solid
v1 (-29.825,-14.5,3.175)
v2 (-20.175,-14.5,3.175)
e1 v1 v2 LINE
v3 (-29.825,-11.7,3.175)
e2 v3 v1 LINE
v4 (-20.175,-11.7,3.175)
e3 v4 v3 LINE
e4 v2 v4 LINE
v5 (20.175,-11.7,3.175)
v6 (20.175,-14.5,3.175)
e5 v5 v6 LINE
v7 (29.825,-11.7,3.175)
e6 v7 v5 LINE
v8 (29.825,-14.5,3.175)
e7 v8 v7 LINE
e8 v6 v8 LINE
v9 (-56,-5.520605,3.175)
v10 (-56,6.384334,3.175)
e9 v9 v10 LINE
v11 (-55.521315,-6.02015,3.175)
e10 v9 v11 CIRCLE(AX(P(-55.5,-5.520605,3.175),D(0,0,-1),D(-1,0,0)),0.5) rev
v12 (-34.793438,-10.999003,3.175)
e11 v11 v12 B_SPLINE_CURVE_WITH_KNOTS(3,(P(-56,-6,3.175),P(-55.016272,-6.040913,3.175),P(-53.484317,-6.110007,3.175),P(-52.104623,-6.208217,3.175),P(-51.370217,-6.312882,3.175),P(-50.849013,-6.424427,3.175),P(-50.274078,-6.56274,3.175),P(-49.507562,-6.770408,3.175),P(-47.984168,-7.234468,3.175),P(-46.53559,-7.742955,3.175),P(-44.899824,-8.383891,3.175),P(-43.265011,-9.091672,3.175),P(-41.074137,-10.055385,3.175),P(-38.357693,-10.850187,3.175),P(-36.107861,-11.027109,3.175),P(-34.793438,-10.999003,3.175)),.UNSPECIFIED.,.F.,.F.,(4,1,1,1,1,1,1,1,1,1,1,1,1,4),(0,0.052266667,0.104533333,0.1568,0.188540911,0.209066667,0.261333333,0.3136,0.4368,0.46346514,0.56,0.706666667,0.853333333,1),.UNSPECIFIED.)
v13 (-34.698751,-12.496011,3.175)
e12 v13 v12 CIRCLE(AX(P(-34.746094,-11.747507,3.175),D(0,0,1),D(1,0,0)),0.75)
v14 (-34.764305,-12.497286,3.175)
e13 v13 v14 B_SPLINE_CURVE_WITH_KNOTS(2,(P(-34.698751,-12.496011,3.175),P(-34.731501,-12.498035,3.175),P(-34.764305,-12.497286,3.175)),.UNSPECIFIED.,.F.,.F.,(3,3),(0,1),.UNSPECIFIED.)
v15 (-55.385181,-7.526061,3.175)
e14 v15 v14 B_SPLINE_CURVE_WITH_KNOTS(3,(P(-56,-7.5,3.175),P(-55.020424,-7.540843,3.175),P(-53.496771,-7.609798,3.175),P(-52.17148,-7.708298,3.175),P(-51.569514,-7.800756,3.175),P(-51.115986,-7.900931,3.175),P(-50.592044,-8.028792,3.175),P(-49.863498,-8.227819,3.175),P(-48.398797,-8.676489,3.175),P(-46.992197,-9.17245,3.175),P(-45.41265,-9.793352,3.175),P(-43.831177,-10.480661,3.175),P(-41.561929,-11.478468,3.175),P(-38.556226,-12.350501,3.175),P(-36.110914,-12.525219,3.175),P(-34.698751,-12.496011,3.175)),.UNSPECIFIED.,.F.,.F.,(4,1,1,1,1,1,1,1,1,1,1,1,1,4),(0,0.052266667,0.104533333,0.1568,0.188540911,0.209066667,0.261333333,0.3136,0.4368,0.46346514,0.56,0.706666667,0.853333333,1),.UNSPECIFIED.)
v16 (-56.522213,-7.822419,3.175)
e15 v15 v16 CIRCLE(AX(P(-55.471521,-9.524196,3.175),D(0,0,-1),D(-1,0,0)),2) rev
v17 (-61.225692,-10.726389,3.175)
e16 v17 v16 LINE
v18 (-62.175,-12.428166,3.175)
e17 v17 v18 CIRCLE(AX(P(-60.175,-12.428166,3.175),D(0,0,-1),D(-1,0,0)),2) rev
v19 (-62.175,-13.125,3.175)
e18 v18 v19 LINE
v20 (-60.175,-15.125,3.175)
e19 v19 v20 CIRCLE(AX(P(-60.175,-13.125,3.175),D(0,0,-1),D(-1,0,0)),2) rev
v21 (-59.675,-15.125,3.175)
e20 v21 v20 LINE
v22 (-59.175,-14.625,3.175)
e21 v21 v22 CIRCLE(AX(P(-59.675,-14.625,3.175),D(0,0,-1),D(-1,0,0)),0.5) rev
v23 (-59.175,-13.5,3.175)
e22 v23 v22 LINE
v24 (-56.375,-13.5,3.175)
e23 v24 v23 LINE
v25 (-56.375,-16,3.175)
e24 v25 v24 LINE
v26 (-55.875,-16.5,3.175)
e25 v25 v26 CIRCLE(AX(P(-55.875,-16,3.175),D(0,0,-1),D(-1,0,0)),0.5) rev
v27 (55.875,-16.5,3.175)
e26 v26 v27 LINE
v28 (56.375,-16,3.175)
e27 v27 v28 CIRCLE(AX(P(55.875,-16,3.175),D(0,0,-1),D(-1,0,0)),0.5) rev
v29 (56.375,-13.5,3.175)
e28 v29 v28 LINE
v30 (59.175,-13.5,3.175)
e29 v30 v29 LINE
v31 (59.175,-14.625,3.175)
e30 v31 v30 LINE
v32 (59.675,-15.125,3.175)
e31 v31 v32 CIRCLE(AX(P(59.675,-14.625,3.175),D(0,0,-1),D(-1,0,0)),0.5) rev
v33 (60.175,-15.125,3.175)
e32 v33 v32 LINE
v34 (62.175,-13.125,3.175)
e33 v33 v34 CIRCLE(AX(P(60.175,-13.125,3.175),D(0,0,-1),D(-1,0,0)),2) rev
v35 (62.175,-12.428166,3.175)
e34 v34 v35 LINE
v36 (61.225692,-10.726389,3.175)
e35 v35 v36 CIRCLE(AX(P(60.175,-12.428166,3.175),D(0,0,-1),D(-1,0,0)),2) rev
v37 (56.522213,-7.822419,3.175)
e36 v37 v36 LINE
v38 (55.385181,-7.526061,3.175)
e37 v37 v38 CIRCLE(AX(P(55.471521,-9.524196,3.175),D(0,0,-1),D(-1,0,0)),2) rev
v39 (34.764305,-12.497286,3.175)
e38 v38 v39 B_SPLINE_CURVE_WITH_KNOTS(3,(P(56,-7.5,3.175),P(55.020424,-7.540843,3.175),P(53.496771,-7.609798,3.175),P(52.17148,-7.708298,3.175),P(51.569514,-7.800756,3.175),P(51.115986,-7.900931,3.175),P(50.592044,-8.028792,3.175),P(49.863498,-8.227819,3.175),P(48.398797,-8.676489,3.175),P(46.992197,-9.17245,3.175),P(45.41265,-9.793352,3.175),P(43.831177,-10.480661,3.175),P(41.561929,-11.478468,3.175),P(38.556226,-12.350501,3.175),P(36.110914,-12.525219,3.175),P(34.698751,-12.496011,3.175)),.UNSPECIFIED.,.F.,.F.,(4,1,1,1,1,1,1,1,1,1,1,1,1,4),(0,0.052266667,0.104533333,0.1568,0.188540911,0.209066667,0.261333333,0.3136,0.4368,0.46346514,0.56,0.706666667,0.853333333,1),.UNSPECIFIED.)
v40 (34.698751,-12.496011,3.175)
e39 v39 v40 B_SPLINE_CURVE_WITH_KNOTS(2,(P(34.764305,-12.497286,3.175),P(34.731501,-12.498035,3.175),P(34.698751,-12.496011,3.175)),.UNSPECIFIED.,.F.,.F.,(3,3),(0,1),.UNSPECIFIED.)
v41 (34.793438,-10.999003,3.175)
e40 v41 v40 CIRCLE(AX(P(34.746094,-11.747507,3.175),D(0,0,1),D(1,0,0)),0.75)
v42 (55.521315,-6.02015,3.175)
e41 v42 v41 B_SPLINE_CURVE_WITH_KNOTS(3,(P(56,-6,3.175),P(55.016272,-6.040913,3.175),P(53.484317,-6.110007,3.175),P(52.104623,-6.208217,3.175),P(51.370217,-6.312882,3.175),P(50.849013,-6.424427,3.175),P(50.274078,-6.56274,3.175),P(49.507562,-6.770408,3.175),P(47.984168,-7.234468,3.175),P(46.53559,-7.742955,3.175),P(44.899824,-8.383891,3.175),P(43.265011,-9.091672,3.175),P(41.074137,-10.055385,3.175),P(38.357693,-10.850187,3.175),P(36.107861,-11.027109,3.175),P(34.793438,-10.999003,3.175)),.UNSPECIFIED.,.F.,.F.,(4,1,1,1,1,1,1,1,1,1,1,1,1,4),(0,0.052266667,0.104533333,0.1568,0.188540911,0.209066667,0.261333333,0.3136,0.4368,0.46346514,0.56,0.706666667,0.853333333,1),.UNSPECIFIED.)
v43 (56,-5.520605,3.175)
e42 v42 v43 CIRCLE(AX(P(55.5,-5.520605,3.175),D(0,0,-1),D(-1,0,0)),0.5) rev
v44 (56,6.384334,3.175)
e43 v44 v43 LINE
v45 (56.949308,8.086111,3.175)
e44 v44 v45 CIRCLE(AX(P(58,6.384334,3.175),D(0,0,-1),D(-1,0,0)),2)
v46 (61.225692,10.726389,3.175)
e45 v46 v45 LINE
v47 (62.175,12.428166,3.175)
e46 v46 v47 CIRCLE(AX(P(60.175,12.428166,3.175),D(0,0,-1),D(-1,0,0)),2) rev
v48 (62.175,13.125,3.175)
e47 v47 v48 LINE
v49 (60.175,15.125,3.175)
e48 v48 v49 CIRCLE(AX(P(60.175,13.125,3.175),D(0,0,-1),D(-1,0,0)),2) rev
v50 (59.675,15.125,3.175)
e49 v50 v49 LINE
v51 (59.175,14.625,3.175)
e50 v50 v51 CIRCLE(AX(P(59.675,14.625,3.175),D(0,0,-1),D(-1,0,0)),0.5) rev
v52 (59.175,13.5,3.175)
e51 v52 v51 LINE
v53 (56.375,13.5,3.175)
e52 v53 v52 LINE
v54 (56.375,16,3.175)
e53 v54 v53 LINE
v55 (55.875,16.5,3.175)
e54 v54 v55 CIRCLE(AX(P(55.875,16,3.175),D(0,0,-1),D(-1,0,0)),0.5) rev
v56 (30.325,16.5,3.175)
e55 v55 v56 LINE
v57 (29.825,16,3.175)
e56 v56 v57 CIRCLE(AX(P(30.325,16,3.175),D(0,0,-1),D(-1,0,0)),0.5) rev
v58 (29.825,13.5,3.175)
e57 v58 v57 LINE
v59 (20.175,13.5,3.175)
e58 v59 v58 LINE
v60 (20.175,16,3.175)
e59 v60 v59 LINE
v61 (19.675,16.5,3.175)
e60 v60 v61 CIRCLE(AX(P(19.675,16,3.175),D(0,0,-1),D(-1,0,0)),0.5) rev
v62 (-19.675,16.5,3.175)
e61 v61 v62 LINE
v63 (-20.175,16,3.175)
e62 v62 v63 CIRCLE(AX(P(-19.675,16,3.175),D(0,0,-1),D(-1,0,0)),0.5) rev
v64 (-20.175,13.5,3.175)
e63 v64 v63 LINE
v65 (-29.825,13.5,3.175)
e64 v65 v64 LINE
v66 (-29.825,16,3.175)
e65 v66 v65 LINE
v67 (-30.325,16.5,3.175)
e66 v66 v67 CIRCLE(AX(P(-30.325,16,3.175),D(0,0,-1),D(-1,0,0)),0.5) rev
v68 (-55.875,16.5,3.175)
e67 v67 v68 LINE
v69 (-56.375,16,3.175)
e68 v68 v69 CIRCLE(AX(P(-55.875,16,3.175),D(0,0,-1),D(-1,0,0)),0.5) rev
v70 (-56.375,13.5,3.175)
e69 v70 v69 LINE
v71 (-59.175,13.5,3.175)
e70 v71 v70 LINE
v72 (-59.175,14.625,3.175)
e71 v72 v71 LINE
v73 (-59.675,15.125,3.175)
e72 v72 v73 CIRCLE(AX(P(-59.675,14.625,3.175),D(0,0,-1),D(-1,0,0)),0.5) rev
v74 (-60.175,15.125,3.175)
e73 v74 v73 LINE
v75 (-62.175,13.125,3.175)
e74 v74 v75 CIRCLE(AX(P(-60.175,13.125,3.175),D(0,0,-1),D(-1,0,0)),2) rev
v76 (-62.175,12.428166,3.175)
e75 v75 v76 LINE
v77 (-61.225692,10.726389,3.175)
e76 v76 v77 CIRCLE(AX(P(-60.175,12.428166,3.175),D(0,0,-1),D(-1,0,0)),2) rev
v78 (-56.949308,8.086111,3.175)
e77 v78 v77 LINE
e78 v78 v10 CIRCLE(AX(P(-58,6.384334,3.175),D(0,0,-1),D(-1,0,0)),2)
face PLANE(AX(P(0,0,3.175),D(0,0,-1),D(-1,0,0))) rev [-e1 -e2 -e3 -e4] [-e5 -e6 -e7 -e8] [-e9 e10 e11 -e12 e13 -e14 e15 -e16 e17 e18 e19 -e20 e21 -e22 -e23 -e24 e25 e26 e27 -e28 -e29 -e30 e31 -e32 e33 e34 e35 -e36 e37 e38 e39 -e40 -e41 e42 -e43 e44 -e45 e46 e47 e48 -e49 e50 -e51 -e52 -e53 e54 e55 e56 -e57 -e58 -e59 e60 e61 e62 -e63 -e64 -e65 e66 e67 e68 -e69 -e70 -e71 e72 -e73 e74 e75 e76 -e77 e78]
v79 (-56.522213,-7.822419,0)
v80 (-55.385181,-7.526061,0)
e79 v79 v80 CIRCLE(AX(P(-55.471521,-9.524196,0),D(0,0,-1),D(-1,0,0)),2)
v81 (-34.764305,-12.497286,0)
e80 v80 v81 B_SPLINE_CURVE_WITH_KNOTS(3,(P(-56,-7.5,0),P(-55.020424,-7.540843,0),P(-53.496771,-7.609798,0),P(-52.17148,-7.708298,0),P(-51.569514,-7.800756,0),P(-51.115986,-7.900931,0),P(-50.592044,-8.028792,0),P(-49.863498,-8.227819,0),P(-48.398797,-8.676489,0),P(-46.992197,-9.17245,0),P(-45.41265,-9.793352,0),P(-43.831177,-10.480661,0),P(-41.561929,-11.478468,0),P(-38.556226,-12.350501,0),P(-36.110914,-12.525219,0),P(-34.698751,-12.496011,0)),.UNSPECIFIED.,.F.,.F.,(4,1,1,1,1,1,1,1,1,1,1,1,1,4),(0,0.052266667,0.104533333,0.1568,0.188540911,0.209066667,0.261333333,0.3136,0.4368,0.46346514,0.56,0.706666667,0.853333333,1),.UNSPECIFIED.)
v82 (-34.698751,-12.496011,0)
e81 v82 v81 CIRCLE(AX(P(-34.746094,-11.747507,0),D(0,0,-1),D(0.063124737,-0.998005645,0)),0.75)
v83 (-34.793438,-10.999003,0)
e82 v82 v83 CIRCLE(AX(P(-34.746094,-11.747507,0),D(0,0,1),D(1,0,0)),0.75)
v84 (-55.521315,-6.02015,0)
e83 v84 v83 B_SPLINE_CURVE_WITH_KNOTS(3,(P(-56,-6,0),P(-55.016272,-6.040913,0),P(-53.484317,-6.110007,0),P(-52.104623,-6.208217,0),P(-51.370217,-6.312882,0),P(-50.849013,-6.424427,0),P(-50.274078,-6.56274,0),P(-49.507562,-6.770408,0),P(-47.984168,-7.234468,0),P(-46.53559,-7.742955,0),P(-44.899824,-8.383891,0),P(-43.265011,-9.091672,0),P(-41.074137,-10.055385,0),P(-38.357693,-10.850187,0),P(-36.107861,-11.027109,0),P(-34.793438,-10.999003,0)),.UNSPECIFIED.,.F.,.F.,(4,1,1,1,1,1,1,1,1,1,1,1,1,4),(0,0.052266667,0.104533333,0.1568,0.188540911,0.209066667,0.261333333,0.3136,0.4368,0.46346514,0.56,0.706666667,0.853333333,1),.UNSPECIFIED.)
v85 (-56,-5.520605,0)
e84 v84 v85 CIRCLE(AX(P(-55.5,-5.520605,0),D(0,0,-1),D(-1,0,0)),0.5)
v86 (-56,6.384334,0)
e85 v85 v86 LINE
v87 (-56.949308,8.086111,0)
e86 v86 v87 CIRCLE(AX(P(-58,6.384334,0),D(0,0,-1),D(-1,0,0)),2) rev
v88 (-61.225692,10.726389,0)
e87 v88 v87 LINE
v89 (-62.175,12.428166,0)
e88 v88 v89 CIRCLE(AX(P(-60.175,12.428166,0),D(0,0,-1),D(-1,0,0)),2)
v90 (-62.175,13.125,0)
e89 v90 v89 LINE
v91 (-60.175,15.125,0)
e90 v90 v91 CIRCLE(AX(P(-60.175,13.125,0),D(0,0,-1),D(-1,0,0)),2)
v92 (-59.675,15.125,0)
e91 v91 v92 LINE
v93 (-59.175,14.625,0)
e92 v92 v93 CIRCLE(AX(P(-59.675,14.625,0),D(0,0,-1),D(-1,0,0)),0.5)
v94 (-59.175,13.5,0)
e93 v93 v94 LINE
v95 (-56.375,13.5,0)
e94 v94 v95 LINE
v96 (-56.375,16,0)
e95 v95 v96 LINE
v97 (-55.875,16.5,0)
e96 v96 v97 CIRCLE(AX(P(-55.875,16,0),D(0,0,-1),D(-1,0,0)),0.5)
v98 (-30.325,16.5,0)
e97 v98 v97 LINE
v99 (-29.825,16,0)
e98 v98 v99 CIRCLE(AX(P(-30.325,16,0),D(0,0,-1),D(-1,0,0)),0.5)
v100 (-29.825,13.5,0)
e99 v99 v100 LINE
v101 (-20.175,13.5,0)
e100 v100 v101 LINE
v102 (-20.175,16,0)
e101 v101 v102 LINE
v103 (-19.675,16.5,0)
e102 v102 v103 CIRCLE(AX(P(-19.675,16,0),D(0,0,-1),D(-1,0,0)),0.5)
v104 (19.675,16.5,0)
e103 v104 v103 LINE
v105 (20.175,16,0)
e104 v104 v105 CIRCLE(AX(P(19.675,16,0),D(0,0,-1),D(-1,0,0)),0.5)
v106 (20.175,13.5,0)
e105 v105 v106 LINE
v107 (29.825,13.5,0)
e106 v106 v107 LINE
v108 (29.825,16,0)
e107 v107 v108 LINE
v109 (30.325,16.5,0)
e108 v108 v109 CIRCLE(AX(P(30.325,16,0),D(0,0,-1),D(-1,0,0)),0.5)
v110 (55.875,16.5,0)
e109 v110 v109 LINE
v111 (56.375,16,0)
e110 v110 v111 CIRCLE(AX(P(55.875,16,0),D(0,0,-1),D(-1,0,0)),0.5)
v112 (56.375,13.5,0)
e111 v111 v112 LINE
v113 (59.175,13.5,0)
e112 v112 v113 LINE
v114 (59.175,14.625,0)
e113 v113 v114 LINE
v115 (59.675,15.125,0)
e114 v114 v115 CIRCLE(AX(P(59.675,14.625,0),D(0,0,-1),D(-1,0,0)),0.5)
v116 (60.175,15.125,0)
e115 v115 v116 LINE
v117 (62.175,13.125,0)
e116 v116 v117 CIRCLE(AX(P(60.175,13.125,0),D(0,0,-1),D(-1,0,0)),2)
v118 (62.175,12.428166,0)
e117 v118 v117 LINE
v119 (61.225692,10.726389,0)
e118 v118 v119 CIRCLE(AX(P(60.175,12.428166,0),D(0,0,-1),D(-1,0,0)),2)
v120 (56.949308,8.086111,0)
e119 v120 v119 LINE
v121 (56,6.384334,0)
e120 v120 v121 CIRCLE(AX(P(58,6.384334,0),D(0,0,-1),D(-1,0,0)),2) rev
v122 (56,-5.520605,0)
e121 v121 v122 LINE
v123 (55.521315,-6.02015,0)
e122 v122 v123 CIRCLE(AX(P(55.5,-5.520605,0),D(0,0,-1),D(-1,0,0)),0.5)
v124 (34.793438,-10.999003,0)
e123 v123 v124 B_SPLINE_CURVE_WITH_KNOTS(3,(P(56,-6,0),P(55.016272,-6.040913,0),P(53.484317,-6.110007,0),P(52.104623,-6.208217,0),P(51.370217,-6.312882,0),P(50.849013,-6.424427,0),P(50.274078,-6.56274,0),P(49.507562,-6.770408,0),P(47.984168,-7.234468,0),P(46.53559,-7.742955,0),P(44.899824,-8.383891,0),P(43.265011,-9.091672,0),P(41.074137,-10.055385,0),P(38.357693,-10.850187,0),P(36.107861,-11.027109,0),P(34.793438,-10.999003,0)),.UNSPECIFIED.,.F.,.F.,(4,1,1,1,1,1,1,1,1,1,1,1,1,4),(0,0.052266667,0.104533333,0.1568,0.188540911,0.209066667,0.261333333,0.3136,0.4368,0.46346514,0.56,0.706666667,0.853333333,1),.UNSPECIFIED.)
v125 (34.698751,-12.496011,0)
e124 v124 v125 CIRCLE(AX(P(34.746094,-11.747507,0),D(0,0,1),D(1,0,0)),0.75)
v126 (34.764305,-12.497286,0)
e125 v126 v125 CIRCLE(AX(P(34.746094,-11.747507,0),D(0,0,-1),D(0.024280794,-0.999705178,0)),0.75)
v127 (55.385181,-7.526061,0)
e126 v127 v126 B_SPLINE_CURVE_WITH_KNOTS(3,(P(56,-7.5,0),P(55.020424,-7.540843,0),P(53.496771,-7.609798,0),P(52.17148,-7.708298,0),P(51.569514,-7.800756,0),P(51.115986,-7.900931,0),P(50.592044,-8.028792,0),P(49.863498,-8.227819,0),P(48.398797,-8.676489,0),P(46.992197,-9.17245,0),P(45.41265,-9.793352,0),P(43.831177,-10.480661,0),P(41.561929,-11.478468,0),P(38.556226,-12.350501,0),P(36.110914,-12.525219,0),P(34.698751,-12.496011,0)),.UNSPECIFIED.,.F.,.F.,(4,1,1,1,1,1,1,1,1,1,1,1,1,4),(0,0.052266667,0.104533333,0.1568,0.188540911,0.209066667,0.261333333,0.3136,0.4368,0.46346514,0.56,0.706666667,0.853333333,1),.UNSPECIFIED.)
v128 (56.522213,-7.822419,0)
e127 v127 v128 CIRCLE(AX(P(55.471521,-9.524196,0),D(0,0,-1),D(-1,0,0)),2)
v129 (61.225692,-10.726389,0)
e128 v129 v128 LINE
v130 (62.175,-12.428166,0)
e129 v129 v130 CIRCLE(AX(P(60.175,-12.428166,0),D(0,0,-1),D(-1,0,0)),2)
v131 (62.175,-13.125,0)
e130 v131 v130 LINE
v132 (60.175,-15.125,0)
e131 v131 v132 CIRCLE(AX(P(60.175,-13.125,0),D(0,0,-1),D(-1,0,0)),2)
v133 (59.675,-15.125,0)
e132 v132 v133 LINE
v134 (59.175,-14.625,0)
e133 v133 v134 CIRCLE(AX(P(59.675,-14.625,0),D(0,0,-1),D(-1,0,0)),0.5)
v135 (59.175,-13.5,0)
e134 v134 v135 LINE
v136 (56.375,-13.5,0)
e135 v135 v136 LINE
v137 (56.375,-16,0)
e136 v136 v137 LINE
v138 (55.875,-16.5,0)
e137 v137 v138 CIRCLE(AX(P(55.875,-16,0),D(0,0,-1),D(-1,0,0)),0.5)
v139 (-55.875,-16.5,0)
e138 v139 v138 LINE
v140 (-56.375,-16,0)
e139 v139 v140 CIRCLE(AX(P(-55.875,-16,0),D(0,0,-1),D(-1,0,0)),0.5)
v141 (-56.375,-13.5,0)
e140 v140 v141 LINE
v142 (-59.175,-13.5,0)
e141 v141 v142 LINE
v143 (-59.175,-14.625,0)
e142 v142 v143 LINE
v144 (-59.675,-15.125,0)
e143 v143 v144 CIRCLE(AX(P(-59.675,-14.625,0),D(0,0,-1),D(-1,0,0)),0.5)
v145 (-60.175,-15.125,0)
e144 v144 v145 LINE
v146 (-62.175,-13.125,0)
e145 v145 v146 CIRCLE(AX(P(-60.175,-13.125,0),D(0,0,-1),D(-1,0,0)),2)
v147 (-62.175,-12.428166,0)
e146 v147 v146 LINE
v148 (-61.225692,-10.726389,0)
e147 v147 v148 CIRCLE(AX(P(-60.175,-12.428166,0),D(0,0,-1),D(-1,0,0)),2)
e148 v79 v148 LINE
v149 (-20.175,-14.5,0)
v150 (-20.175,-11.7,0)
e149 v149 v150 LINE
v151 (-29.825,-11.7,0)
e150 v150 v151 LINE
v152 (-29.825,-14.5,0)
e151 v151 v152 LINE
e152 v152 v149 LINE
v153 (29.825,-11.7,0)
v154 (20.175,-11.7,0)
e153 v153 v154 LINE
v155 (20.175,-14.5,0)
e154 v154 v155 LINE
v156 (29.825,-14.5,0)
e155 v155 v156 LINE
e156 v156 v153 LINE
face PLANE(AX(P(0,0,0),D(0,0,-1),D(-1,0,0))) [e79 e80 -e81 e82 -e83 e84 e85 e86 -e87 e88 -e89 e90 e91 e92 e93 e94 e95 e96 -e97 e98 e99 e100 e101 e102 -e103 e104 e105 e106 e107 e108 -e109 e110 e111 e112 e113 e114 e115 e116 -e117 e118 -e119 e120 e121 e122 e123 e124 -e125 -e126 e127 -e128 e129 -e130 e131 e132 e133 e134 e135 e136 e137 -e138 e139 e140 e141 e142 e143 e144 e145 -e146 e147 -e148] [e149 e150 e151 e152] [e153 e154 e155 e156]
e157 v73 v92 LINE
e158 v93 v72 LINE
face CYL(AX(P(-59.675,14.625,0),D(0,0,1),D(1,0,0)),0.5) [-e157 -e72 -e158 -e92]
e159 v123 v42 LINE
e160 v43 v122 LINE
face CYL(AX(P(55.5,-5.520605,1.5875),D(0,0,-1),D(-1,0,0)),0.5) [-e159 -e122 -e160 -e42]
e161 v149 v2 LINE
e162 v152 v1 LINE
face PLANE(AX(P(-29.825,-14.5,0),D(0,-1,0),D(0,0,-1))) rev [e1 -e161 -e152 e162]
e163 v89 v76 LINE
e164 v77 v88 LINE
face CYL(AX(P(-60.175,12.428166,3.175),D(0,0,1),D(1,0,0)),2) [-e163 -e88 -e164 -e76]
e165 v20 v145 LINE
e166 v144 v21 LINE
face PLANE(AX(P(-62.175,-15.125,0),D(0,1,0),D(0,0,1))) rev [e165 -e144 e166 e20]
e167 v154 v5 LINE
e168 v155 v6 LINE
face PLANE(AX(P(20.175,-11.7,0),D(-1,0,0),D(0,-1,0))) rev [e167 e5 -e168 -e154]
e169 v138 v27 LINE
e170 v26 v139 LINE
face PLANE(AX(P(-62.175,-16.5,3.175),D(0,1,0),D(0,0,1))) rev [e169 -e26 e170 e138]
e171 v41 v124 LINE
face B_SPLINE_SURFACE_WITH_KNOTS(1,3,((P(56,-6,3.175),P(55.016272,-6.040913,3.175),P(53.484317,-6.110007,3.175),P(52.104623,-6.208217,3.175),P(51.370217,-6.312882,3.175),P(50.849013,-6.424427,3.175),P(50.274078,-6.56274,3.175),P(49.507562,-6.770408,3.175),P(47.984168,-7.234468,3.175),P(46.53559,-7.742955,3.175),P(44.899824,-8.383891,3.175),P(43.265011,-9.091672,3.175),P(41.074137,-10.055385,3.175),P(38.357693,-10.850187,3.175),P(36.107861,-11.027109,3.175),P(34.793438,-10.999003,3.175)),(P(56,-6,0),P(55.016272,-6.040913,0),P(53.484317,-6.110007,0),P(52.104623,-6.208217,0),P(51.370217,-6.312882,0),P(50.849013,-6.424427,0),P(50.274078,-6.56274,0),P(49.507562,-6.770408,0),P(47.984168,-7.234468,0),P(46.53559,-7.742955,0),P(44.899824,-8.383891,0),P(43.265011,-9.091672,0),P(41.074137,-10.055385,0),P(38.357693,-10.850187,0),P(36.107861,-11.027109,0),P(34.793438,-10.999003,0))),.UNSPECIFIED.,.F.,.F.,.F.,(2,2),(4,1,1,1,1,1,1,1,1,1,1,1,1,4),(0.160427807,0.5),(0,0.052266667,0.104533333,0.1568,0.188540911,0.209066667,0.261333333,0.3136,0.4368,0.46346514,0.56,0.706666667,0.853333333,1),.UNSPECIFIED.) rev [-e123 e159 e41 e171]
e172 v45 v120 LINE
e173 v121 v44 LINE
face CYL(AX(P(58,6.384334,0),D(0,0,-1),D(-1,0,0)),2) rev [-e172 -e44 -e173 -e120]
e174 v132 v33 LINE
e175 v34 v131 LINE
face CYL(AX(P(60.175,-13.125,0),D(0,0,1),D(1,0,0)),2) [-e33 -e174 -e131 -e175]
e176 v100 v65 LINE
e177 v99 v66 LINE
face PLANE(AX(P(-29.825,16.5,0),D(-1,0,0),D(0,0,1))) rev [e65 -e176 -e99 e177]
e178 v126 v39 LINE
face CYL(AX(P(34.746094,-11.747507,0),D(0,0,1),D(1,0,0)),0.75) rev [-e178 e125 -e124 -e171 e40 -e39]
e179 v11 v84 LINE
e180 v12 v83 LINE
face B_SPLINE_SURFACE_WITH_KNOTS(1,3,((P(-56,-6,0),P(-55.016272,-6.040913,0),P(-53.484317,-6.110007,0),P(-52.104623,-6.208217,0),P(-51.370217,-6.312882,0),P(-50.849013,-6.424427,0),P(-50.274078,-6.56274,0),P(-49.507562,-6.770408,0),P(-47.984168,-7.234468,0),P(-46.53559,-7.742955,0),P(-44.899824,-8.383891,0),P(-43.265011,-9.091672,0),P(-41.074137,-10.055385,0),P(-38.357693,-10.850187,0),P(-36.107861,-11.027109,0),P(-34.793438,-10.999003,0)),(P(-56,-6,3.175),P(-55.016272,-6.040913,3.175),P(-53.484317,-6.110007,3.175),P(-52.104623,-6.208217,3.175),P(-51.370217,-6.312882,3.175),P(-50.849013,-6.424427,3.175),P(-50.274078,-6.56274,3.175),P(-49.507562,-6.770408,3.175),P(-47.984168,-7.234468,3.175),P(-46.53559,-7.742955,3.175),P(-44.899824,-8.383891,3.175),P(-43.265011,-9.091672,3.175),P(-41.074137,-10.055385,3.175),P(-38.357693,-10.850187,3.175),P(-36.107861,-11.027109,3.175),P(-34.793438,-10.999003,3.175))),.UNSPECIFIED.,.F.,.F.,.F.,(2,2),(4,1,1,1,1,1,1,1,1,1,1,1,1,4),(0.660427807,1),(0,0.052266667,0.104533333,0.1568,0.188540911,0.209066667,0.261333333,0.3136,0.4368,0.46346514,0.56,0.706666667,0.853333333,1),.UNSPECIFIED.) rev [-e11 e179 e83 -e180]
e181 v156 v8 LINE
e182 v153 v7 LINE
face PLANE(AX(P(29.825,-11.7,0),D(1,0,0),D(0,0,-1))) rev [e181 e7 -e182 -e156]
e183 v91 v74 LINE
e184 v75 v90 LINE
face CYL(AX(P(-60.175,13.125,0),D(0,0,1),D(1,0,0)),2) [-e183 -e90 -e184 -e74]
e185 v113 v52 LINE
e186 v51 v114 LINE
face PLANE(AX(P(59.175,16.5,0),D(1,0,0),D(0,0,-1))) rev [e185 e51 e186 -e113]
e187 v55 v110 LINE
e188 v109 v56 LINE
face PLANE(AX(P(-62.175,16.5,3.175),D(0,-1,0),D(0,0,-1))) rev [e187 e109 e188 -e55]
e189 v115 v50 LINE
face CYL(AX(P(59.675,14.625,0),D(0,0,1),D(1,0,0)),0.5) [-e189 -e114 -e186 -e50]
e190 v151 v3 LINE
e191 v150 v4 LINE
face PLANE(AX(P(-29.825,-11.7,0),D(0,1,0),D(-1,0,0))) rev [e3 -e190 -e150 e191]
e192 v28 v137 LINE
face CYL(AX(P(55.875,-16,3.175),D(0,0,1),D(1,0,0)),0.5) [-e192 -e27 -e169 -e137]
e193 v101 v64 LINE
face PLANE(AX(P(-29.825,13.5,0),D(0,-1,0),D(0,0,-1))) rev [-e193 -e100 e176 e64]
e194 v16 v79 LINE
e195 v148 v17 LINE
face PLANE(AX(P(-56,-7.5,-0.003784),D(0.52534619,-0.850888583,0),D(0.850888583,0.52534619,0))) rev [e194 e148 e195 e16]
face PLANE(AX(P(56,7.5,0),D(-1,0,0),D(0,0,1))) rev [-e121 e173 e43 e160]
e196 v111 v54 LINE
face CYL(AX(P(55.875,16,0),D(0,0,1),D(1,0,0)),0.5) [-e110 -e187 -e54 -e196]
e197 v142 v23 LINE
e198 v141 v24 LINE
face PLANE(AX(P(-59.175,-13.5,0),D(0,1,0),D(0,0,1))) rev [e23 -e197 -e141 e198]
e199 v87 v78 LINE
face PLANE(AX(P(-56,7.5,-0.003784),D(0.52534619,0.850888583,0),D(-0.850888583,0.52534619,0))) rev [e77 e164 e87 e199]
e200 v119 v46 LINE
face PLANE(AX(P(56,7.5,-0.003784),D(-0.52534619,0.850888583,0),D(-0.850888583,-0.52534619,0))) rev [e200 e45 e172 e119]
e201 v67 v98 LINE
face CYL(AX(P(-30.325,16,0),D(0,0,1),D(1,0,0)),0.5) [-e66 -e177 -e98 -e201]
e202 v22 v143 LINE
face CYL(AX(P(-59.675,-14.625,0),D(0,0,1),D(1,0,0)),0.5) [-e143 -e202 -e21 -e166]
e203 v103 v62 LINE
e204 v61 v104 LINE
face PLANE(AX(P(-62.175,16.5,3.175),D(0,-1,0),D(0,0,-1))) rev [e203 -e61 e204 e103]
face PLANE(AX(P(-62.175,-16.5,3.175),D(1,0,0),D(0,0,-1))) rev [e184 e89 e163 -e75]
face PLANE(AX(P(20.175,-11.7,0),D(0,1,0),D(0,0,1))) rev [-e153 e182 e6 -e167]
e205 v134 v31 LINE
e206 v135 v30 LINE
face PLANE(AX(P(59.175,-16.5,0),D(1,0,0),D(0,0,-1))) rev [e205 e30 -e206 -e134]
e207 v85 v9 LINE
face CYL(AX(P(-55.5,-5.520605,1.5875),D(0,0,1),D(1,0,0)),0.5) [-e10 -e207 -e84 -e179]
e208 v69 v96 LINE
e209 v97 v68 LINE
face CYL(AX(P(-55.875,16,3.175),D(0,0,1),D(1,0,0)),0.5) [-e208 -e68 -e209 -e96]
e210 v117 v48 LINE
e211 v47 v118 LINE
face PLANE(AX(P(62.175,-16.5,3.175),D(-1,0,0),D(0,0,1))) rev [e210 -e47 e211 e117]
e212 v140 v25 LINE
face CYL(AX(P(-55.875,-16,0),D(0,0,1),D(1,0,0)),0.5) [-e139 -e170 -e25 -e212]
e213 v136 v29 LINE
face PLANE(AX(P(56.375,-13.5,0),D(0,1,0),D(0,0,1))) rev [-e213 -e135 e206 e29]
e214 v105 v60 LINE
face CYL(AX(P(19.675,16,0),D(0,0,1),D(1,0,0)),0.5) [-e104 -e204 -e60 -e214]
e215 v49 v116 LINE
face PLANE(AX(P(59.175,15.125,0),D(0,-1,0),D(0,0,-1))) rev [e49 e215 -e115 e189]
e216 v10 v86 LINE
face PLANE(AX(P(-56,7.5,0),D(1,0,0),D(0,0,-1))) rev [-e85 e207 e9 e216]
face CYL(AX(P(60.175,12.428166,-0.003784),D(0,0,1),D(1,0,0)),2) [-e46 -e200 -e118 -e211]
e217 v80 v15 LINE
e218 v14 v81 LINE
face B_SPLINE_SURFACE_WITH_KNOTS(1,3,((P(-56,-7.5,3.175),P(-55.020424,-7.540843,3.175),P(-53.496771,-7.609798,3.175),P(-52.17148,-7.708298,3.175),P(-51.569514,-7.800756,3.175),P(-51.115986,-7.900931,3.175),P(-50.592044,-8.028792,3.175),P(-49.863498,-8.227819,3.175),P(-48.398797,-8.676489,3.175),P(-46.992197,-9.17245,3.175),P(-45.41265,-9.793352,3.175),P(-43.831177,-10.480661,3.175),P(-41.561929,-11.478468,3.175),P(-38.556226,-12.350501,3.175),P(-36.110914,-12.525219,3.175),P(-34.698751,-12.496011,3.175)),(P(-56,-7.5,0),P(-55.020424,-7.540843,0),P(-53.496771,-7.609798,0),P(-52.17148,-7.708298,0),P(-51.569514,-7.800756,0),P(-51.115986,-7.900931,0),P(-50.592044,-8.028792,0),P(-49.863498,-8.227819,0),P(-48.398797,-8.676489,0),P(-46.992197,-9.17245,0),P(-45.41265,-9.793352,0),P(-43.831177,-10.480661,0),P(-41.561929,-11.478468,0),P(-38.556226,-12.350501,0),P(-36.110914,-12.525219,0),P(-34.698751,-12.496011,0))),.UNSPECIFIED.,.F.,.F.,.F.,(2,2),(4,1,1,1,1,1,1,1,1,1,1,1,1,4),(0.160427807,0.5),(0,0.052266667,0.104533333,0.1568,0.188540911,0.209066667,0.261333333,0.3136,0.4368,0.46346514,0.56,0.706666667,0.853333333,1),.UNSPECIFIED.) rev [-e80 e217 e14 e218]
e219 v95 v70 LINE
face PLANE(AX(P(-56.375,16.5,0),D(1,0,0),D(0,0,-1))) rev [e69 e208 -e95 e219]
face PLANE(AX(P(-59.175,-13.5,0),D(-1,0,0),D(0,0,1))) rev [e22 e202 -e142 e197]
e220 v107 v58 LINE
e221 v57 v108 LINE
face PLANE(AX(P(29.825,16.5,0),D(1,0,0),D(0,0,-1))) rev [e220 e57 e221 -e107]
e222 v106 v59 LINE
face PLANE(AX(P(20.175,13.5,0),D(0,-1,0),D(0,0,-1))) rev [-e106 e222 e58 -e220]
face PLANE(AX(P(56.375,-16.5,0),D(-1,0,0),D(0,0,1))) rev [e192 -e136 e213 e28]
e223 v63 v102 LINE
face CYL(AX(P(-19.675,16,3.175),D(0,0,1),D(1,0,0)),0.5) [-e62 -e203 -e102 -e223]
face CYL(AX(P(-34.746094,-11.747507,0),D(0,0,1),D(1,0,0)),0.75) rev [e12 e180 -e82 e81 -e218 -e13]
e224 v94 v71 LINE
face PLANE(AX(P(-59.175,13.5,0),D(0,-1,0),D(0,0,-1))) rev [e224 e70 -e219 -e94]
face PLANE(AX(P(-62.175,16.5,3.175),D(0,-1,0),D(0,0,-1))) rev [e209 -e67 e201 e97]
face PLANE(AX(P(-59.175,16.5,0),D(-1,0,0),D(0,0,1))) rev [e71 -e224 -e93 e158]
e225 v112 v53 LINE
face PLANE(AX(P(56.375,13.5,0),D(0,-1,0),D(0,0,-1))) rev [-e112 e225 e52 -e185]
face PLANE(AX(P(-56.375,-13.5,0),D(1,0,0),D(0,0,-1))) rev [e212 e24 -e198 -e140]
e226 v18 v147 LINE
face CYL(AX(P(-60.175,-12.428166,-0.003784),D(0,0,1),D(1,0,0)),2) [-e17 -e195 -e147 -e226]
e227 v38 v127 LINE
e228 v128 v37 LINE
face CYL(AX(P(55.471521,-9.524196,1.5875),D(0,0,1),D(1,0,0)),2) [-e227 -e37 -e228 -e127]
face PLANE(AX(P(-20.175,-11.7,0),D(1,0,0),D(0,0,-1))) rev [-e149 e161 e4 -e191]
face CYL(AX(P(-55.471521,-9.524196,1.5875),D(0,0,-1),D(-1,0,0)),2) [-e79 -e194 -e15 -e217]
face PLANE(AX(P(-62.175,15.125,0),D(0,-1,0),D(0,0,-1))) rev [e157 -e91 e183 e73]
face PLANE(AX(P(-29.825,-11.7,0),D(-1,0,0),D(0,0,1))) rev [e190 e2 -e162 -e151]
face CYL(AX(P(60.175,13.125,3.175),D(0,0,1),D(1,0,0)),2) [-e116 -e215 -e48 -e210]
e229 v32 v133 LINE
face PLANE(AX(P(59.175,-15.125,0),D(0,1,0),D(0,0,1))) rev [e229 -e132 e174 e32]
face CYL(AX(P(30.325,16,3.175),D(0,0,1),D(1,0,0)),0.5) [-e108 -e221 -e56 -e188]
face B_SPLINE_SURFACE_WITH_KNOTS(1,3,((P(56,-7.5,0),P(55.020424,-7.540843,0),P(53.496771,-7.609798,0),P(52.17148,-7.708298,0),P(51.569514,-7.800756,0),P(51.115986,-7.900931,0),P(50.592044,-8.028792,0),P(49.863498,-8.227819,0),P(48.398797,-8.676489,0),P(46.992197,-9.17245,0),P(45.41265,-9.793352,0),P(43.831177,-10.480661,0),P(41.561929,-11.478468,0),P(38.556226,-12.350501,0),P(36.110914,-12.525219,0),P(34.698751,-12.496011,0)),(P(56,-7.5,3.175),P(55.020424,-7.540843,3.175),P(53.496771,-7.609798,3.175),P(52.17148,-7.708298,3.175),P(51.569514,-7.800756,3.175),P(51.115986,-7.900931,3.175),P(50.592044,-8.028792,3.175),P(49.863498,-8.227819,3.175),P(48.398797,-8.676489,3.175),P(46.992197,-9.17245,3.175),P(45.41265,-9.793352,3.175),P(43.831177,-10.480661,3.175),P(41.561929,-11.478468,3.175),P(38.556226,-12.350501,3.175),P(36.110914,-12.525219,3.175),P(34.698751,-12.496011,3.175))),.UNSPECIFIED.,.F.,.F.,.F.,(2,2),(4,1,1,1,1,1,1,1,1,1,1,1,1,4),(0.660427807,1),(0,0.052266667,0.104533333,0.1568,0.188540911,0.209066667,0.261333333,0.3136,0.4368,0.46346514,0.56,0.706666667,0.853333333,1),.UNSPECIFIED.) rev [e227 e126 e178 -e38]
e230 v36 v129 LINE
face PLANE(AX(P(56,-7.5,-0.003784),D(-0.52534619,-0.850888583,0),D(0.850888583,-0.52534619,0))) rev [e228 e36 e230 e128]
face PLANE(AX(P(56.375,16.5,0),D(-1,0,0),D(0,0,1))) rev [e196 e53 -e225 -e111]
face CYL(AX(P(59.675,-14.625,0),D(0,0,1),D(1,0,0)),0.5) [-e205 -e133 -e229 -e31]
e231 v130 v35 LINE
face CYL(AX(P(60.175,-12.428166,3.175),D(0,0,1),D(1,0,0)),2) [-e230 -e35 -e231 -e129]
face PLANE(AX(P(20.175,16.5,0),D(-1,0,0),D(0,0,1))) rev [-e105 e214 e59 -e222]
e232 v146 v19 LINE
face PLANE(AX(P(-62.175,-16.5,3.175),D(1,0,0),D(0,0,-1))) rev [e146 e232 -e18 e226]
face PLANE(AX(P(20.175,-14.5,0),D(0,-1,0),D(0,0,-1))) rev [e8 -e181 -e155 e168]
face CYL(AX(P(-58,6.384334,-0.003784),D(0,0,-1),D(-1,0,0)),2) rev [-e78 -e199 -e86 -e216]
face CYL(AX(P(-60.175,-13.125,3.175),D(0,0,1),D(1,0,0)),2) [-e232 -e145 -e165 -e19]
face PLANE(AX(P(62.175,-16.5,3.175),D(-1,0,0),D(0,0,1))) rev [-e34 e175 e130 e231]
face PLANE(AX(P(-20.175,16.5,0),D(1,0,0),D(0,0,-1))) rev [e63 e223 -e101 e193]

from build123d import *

# Parameters (mm, degrees)
SKETCH1_W           = 124.35
SKETCH1_H           = 33
BOSS_EXTRUDE1_DEPTH = 3.175
SKETCH2_W           = 9.65
SKETCH2_H           = 2.8
SKETCH2_H_2         = 3
CUT_EXTRUDE1_DEPTH  = 65.405444257
SKETCH4_W           = 2.8
SKETCH4_H           = 3
SKETCH4_W_2         = 6.175
SKETCH4_H_2         = 15
CUT_EXTRUDE2_DEPTH  = 65.405444257
SKETCH6_W           = 3
SKETCH6_H           = 1.375
CUT_EXTRUDE3_DEPTH  = 65.405444257
CUT_SWEEP1_DEPTH    = 3.175
SKETCH12_R          = 0.75
CUT_EXTRUDE6_DEPTH  = 65.405444385
CUT_EXTRUDE7_DEPTH  = 65.405444385
FILLET6_R           = 2
FILLET7_R           = 0.5


# Read off the part's stored shape, not the designer's step: Cut-Sweep1
with BuildPart() as part:
    # Sketch1 → Boss-Extrude1 (new body)
    with BuildSketch(Plane.XY):
        Rectangle(SKETCH1_W, SKETCH1_H)
    extrude(amount=BOSS_EXTRUDE1_DEPTH)

    # Sketch2 → Cut-Extrude1 (cut, through all)
    with BuildSketch(Plane.XY.offset(3.175)):
        with Locations((-25, -13.1)):
            Rectangle(SKETCH2_W, SKETCH2_H)
        with Locations((25, -13.1)):
            Rectangle(SKETCH2_W, SKETCH2_H)
        with Locations((-25, 15)):
            Rectangle(SKETCH2_W, SKETCH2_H_2)
        with Locations((25, 15)):
            Rectangle(SKETCH2_W, SKETCH2_H_2)
    extrude(amount=-CUT_EXTRUDE1_DEPTH, mode=Mode.SUBTRACT)

    # Sketch4 → Cut-Extrude2 (cut, through all)
    with BuildSketch(Plane.XY.offset(3.175)):
        with Locations((-57.775, 15)):
            Rectangle(SKETCH4_W, SKETCH4_H)
        with Locations((-59.0875, 0)):
            Rectangle(SKETCH4_W_2, SKETCH4_H_2)
        with Locations((-57.775, -15)):
            Rectangle(SKETCH4_W, SKETCH4_H)
        with Locations((57.775, 15)):
            Rectangle(SKETCH4_W, SKETCH4_H)
        with Locations((59.0875, 0)):
            Rectangle(SKETCH4_W_2, SKETCH4_H_2)
        with Locations((57.775, -15)):
            Rectangle(SKETCH4_W, SKETCH4_H)
    extrude(amount=-CUT_EXTRUDE2_DEPTH, mode=Mode.SUBTRACT)

    # Sketch6 → Cut-Extrude3 (cut, through all)
    with BuildSketch(Plane.XY.offset(3.175)):
        with Locations((-60.675, 15.8125)):
            Rectangle(SKETCH6_W, SKETCH6_H)
        with Locations((-60.675, -15.8125)):
            Rectangle(SKETCH6_W, SKETCH6_H)
        with Locations((60.675, 15.8125)):
            Rectangle(SKETCH6_W, SKETCH6_H)
        with Locations((60.675, -15.8125)):
            Rectangle(SKETCH6_W, SKETCH6_H)
    extrude(amount=-CUT_EXTRUDE3_DEPTH, mode=Mode.SUBTRACT)

    # Cut-Sweep1 outline → Cut-Sweep1 (cut)
    with BuildSketch(Plane.XY):
        with BuildLine():
            add(Edge.make_bspline(
                [(-56, -6), (-55.016272395, -6.040912607), (-53.484317245, -6.110006936), (-52.10462272, -6.208217255), (-51.370216858, -6.312882143), (-50.849013323, -6.424427059), (-50.274077583, -6.562740427), (-49.507561658, -6.770408498), (-47.98416767, -7.234467607), (-46.535590196, -7.742954919), (-44.899823838, -8.383891144), (-43.265010906, -9.091671777), (-41.074137026, -10.055384808), (-38.357692762, -10.850187014), (-36.1078612, -11.027108547), (-34.793437631, -10.999002823)],
                knots=[0, 0, 0, 0, 0.052266667, 0.104533333, 0.1568, 0.188540911, 0.209066667, 0.261333333, 0.3136, 0.4368, 0.46346514, 0.56, 0.706666667, 0.853333333, 1, 1, 1, 1], degree=3))
            Line((-56, -6), (-56, -7.5))
            add(Edge.make_bspline(
                [(-56, -7.5), (-55.020423649, -7.540842864), (-53.496771007, -7.609797709), (-52.171479553, -7.70829789), (-51.569513747, -7.80075633), (-51.115986388, -7.900930823), (-50.592043829, -8.028791809), (-49.863497697, -8.22781936), (-48.398796638, -8.676488924), (-46.992197023, -9.172450468), (-45.412650318, -9.7933523), (-43.831176536, -10.480660701), (-41.561928867, -11.478467634), (-38.556226285, -12.350501385), (-36.110914304, -12.525218982), (-34.698750526, -12.49601129)],
                knots=[0, 0, 0, 0, 0.052266667, 0.104533333, 0.1568, 0.188540911, 0.209066667, 0.261333333, 0.3136, 0.4368, 0.46346514, 0.56, 0.706666667, 0.853333333, 1, 1, 1, 1], degree=3))
            Line((-34.698750526, -12.49601129), (-34.793437631, -10.999002823))
        make_face()
    cut_sweep1 = extrude(amount=CUT_SWEEP1_DEPTH, mode=Mode.SUBTRACT)

    # Mirror1: Cut-Sweep1 across plane
    add(cut_sweep1.mirror(Plane.ZY), mode=Mode.SUBTRACT)

    # Sketch12 → Cut-Extrude6 (cut, through all)
    with BuildSketch(Plane.XY.offset(3.175)):
        with Locations((-34.746094079, -11.747507056)):
            Circle(SKETCH12_R)
        with Locations((34.746094079, -11.747507056)):
            Circle(SKETCH12_R)
    extrude(amount=-CUT_EXTRUDE6_DEPTH, mode=Mode.SUBTRACT)

    # Sketch13 → Cut-Extrude7 (cut, through all)
    with BuildSketch(Plane.XY.offset(3.175)):
        Polygon((-56, 7.5), (-62.175, 11.3125), (-62.175, 7.5), align=None)
        Polygon((-56, -7.5), (-62.175, -11.3125), (-62.175, -7.5), align=None)
        Polygon((56, 7.5), (62.175, 11.3125), (62.175, 7.5), align=None)
        Polygon((56, -7.5), (62.175, -11.3125), (62.175, -7.5), align=None)
    extrude(amount=-CUT_EXTRUDE7_DEPTH, mode=Mode.SUBTRACT)

    # Fillet6
    fillet6_edges = [part.edges().sort_by_distance(p)[0] for p in [
        (62.175, -15.125, 1.5875),
        (62.175, -11.3125, 1.5875),
        (56, -7.5, 1.5875),
        (56, 7.5, 1.5875),
        (62.175, 11.3125, 1.5875),
        (62.175, 15.125, 1.5875),
        (-62.175, -15.125, 1.5875),
        (-62.175, -11.3125, 1.5875),
        (-56, -7.5, 1.5875),
        (-62.175, 15.125, 1.5875),
        (-62.175, 11.3125, 1.5875),
        (-56, 7.5, 1.5875),
    ]]
    fillet(fillet6_edges, radius=FILLET6_R)

    # Fillet7
    fillet7_edges = [part.edges().sort_by_distance(p)[0] for p in [
        (59.175, 15.125, 1.5875),
        (59.175, -15.125, 1.5875),
        (-59.175, -15.125, 1.5875),
        (-59.175, 15.125, 1.5875),
        (20.175, 16.5, 1.5875),
        (29.825, 16.5, 1.5875),
        (-20.175, 16.5, 1.5875),
        (-29.825, 16.5, 1.5875),
        (56.375, -16.5, 1.5875),
        (56, -6, 1.5875),
        (56.375, 16.5, 1.5875),
        (-56.375, 16.5, 1.5875),
        (-56.375, -16.5, 1.5875),
        (-56, -6, 1.5875),
    ]]
    fillet(fillet7_edges, radius=FILLET7_R)


solid = part.part
